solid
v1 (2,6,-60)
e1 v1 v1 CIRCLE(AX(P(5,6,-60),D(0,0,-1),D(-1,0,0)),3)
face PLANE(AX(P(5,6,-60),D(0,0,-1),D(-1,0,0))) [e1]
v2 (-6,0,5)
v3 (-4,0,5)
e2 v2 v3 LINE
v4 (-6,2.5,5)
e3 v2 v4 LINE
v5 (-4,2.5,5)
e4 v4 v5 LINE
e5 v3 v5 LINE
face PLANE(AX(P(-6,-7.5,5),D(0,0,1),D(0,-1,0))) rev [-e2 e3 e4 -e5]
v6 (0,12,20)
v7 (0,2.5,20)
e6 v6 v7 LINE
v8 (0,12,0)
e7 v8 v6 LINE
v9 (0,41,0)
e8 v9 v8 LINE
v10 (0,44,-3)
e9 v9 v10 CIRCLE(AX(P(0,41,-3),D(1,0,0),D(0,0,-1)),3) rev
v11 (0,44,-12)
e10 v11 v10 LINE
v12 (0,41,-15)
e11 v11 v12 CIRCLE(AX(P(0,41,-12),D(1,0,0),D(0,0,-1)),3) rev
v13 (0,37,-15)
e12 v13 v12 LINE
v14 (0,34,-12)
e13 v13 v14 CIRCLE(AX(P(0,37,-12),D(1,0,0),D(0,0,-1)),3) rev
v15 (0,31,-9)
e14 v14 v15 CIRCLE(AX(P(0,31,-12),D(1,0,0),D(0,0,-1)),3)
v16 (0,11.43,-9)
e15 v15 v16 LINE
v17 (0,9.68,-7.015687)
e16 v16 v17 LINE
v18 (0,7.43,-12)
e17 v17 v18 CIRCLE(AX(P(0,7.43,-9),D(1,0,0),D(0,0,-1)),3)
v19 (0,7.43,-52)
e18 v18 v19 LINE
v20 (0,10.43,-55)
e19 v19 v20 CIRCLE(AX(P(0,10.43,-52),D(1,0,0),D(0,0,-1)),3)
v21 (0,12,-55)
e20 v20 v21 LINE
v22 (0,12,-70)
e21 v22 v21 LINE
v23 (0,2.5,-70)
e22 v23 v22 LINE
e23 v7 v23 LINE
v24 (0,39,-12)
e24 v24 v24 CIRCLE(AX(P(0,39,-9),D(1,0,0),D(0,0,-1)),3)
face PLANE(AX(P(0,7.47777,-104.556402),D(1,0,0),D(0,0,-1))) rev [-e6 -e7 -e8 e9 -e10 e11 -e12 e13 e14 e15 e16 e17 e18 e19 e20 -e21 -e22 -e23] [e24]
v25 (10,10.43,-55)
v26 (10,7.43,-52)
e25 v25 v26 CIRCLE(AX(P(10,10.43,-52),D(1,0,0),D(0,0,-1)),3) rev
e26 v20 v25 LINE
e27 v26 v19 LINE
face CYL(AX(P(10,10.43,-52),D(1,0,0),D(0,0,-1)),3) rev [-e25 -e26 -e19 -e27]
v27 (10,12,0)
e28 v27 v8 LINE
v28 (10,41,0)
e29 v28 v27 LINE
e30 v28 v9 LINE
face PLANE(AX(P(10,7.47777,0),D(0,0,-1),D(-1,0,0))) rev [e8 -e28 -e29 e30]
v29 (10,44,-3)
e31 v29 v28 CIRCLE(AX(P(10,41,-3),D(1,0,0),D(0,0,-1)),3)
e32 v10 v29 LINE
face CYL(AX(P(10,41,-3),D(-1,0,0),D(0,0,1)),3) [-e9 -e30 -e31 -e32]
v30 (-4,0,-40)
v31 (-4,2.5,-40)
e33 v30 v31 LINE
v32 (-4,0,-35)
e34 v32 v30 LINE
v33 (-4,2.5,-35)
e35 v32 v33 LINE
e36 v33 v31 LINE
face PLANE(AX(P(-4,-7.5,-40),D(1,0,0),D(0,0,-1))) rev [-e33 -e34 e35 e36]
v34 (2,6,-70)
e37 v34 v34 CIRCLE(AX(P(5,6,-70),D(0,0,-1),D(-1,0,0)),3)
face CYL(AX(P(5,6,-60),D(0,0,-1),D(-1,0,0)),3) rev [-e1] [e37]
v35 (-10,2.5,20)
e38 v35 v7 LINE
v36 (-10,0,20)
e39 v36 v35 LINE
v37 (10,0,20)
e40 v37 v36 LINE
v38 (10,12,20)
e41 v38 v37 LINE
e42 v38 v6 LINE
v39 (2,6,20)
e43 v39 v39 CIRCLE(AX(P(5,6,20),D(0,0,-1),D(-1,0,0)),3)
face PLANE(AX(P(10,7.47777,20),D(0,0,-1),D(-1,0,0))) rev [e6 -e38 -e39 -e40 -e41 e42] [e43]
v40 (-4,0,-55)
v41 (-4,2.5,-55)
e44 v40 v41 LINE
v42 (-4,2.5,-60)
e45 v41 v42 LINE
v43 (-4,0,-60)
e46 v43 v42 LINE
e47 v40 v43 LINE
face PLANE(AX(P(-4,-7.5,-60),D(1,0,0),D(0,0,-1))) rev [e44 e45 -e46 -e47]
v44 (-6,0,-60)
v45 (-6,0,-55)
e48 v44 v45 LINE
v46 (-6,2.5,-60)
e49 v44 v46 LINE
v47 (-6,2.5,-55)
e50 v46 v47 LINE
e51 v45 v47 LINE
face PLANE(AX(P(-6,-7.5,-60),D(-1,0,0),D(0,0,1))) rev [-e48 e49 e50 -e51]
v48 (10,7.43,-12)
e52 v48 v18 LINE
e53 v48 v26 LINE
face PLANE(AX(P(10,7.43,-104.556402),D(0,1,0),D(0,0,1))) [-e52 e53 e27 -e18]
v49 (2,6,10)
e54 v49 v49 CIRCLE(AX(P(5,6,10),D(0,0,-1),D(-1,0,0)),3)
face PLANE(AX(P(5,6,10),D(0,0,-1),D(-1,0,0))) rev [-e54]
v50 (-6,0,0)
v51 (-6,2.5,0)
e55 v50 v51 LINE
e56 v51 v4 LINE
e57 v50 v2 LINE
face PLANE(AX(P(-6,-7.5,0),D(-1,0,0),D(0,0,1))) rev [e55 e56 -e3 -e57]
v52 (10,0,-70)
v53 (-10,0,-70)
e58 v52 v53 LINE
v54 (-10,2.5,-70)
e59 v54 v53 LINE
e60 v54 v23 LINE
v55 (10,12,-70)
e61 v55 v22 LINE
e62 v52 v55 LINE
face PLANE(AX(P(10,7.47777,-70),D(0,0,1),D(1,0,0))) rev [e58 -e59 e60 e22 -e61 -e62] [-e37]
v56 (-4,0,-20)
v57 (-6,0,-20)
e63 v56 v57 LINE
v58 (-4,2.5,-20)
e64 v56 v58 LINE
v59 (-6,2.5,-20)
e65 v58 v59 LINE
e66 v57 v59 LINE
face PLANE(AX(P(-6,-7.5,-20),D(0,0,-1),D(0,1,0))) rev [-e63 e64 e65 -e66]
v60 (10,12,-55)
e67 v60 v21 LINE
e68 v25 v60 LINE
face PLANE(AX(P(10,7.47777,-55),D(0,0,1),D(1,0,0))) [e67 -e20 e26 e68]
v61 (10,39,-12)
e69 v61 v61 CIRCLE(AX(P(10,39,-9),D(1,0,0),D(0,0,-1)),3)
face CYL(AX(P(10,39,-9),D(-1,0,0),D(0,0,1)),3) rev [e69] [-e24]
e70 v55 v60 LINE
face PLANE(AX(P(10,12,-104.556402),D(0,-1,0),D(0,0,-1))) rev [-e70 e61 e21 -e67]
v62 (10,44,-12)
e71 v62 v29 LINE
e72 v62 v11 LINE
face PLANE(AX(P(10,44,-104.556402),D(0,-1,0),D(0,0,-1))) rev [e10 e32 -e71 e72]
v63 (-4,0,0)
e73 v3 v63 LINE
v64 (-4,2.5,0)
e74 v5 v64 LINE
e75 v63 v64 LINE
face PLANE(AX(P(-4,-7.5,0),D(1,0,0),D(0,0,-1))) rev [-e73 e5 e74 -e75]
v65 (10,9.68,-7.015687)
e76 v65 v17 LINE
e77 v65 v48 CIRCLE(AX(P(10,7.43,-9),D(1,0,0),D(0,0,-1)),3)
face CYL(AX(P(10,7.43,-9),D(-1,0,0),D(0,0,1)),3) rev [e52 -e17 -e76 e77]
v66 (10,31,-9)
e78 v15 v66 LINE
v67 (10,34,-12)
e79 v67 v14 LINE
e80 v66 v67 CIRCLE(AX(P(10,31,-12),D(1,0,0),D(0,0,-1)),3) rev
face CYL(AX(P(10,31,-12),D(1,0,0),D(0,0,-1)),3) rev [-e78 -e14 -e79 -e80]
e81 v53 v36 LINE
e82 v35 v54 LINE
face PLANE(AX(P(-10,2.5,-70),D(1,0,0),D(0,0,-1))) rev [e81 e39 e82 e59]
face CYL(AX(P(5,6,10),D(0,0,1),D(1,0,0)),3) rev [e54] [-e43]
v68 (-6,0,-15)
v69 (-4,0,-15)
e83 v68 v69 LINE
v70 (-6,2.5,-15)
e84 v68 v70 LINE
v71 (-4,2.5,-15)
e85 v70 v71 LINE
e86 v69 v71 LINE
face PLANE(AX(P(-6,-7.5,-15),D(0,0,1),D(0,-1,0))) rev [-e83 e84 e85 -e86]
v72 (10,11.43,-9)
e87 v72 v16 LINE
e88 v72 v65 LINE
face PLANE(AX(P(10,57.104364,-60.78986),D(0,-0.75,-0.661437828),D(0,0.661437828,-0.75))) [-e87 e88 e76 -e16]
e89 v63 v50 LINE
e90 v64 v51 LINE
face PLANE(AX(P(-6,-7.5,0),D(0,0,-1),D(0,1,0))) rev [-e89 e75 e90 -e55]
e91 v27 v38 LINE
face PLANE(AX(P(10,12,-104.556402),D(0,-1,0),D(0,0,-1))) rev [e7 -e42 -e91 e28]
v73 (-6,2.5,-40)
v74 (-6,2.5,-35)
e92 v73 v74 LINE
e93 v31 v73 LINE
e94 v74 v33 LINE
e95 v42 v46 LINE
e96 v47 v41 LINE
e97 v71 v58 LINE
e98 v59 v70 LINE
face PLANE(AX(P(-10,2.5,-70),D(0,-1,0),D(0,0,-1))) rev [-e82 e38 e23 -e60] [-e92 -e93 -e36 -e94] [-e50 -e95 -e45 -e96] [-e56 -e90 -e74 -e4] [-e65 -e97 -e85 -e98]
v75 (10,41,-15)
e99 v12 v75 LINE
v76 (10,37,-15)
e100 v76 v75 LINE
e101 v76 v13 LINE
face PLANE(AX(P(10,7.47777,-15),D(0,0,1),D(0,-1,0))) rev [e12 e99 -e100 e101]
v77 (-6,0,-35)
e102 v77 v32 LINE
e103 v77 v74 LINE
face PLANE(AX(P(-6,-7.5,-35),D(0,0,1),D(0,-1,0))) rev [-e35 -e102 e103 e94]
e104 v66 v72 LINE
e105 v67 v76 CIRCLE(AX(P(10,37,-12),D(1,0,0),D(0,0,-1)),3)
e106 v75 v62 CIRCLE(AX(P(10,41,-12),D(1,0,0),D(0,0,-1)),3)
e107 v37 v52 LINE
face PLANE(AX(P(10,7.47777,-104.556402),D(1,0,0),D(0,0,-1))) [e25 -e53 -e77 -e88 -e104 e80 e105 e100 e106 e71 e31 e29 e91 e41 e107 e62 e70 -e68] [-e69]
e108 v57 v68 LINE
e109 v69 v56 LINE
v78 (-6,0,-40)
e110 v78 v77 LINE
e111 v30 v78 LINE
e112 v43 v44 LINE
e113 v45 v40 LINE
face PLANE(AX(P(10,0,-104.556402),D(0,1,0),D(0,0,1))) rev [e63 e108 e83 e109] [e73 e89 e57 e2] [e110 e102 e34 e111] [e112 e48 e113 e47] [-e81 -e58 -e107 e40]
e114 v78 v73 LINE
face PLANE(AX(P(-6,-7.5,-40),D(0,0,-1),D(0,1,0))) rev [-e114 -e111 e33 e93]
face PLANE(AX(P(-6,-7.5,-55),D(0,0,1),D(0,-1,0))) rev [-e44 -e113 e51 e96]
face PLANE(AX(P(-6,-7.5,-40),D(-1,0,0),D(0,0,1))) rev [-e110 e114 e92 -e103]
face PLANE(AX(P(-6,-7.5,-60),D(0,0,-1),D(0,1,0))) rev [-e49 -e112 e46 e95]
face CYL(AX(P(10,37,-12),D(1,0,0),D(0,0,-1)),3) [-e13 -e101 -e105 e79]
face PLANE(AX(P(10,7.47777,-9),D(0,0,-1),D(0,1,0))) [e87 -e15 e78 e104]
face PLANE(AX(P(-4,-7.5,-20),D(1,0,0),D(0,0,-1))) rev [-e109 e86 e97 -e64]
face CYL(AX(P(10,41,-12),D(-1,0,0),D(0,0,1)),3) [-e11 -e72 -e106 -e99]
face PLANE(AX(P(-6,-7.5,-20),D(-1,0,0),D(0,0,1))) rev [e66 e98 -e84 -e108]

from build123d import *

# Parameters (mm, degrees)
ESBO_O1_R                = 3
RESSALTO_EXTRUS_O1_DEPTH = 10
ESBO_O2_R                = 3
CORTE_EXTRUS_O1_DEPTH    = 10
CORTE_EXTRUS_O2_START    = -80
ESBO_O2_2_R              = 3
CORTE_EXTRUS_O2_DEPTH    = 10
FILETE1_R                = 3
ESBO_O3_W                = 90
ESBO_O3_H                = 2.5
RESSALTO_EXTRUS_O2_DEPTH = 10
ESBO_O4_W                = 2
ESBO_O4_H                = 5
CORTE_EXTRUS_O3_DEPTH    = 10
PADR_O_LINEAR1_COUNT     = 4
PADR_O_LINEAR1_PITCH     = 20


with BuildPart() as part:
    # Esboço1 → Ressalto-extrusão1 (new body)
    with BuildSketch(Plane(origin=(0, 0, 0), x_dir=(0, 0, -1), z_dir=(1, 0, 0))):
        with BuildLine():
            Line((15, 44), (0, 44))
            Line((0, 44), (0, 12))
            Line((0, 12), (-20, 12))
            Line((-20, 12), (-20, 0))
            Line((-20, 0), (70, 0))
            Line((70, 0), (70, 12))
            Line((70, 12), (55, 12))
            Line((55, 12), (55, 7.43))
            Line((55, 7.43), (12, 7.43))
            ThreePointArc((12, 7.43), (7.765686518, 4.695686516), (7.015686515, 9.679999999))
            Line((7.015686515, 9.679999999), (9, 11.430000002))
            Line((9, 11.430000002), (9, 34))
            Line((9, 34), (15, 34))
            Line((15, 34), (15, 44))
        make_face()
        with Locations((9, 39)):
            Circle(ESBO_O1_R, mode=Mode.SUBTRACT)
    extrude(amount=RESSALTO_EXTRUS_O1_DEPTH)

    # Esboço2 → Corte-extrusão1 (cut)
    with BuildSketch(Plane(origin=(0, 0, -70), x_dir=(-1, 0, 0), z_dir=(0, 0, -1))):
        with Locations((-5, 6)):
            Circle(ESBO_O2_R)
    extrude(amount=-CORTE_EXTRUS_O1_DEPTH, mode=Mode.SUBTRACT)

    # Esboço2<2> → Corte-extrusão2 (cut)
    with BuildSketch(Plane(origin=(0, 0, -70), x_dir=(-1, 0, 0), z_dir=(0, 0, -1)).offset(CORTE_EXTRUS_O2_START)):
        with Locations((-5, 6)):
            Circle(ESBO_O2_2_R)
    extrude(amount=-CORTE_EXTRUS_O2_DEPTH, mode=Mode.SUBTRACT)

    # Filete1
    filete1_edges = [part.edges().sort_by_distance(p)[0] for p in [
        (5, 7.43, -55),
        (5, 44, 0),
        (5, 44, -15),
        (5, 34, -15),
        (5, 34, -9),
    ]]
    fillet(filete1_edges, radius=FILETE1_R - 0.0001)  # a hair under: the kernel refuses the full size

    # Esboço3 → Ressalto-extrusão2 (add)
    with BuildSketch(Plane.ZY):
        with Locations((-25, 1.25)):
            Rectangle(ESBO_O3_W, ESBO_O3_H)
    extrude(amount=RESSALTO_EXTRUS_O2_DEPTH)

    # Esboço4 → Corte-extrusão3 (cut)
    with BuildSketch(Plane(origin=(0, 2.5, 0), x_dir=(1, 0, 0), z_dir=(0, 1, 0))):
        with Locations((-5, 57.5)):
            Rectangle(ESBO_O4_W, ESBO_O4_H)
    corte_extrus_o3 = extrude(amount=-CORTE_EXTRUS_O3_DEPTH, mode=Mode.SUBTRACT)

    # Padrão linear1: Corte-extrusão3 ×4
    with Locations(*[(0, 0, i * PADR_O_LINEAR1_PITCH) for i in range(1, PADR_O_LINEAR1_COUNT)]):
        add(corte_extrus_o3, mode=Mode.SUBTRACT)


solid = part.part
